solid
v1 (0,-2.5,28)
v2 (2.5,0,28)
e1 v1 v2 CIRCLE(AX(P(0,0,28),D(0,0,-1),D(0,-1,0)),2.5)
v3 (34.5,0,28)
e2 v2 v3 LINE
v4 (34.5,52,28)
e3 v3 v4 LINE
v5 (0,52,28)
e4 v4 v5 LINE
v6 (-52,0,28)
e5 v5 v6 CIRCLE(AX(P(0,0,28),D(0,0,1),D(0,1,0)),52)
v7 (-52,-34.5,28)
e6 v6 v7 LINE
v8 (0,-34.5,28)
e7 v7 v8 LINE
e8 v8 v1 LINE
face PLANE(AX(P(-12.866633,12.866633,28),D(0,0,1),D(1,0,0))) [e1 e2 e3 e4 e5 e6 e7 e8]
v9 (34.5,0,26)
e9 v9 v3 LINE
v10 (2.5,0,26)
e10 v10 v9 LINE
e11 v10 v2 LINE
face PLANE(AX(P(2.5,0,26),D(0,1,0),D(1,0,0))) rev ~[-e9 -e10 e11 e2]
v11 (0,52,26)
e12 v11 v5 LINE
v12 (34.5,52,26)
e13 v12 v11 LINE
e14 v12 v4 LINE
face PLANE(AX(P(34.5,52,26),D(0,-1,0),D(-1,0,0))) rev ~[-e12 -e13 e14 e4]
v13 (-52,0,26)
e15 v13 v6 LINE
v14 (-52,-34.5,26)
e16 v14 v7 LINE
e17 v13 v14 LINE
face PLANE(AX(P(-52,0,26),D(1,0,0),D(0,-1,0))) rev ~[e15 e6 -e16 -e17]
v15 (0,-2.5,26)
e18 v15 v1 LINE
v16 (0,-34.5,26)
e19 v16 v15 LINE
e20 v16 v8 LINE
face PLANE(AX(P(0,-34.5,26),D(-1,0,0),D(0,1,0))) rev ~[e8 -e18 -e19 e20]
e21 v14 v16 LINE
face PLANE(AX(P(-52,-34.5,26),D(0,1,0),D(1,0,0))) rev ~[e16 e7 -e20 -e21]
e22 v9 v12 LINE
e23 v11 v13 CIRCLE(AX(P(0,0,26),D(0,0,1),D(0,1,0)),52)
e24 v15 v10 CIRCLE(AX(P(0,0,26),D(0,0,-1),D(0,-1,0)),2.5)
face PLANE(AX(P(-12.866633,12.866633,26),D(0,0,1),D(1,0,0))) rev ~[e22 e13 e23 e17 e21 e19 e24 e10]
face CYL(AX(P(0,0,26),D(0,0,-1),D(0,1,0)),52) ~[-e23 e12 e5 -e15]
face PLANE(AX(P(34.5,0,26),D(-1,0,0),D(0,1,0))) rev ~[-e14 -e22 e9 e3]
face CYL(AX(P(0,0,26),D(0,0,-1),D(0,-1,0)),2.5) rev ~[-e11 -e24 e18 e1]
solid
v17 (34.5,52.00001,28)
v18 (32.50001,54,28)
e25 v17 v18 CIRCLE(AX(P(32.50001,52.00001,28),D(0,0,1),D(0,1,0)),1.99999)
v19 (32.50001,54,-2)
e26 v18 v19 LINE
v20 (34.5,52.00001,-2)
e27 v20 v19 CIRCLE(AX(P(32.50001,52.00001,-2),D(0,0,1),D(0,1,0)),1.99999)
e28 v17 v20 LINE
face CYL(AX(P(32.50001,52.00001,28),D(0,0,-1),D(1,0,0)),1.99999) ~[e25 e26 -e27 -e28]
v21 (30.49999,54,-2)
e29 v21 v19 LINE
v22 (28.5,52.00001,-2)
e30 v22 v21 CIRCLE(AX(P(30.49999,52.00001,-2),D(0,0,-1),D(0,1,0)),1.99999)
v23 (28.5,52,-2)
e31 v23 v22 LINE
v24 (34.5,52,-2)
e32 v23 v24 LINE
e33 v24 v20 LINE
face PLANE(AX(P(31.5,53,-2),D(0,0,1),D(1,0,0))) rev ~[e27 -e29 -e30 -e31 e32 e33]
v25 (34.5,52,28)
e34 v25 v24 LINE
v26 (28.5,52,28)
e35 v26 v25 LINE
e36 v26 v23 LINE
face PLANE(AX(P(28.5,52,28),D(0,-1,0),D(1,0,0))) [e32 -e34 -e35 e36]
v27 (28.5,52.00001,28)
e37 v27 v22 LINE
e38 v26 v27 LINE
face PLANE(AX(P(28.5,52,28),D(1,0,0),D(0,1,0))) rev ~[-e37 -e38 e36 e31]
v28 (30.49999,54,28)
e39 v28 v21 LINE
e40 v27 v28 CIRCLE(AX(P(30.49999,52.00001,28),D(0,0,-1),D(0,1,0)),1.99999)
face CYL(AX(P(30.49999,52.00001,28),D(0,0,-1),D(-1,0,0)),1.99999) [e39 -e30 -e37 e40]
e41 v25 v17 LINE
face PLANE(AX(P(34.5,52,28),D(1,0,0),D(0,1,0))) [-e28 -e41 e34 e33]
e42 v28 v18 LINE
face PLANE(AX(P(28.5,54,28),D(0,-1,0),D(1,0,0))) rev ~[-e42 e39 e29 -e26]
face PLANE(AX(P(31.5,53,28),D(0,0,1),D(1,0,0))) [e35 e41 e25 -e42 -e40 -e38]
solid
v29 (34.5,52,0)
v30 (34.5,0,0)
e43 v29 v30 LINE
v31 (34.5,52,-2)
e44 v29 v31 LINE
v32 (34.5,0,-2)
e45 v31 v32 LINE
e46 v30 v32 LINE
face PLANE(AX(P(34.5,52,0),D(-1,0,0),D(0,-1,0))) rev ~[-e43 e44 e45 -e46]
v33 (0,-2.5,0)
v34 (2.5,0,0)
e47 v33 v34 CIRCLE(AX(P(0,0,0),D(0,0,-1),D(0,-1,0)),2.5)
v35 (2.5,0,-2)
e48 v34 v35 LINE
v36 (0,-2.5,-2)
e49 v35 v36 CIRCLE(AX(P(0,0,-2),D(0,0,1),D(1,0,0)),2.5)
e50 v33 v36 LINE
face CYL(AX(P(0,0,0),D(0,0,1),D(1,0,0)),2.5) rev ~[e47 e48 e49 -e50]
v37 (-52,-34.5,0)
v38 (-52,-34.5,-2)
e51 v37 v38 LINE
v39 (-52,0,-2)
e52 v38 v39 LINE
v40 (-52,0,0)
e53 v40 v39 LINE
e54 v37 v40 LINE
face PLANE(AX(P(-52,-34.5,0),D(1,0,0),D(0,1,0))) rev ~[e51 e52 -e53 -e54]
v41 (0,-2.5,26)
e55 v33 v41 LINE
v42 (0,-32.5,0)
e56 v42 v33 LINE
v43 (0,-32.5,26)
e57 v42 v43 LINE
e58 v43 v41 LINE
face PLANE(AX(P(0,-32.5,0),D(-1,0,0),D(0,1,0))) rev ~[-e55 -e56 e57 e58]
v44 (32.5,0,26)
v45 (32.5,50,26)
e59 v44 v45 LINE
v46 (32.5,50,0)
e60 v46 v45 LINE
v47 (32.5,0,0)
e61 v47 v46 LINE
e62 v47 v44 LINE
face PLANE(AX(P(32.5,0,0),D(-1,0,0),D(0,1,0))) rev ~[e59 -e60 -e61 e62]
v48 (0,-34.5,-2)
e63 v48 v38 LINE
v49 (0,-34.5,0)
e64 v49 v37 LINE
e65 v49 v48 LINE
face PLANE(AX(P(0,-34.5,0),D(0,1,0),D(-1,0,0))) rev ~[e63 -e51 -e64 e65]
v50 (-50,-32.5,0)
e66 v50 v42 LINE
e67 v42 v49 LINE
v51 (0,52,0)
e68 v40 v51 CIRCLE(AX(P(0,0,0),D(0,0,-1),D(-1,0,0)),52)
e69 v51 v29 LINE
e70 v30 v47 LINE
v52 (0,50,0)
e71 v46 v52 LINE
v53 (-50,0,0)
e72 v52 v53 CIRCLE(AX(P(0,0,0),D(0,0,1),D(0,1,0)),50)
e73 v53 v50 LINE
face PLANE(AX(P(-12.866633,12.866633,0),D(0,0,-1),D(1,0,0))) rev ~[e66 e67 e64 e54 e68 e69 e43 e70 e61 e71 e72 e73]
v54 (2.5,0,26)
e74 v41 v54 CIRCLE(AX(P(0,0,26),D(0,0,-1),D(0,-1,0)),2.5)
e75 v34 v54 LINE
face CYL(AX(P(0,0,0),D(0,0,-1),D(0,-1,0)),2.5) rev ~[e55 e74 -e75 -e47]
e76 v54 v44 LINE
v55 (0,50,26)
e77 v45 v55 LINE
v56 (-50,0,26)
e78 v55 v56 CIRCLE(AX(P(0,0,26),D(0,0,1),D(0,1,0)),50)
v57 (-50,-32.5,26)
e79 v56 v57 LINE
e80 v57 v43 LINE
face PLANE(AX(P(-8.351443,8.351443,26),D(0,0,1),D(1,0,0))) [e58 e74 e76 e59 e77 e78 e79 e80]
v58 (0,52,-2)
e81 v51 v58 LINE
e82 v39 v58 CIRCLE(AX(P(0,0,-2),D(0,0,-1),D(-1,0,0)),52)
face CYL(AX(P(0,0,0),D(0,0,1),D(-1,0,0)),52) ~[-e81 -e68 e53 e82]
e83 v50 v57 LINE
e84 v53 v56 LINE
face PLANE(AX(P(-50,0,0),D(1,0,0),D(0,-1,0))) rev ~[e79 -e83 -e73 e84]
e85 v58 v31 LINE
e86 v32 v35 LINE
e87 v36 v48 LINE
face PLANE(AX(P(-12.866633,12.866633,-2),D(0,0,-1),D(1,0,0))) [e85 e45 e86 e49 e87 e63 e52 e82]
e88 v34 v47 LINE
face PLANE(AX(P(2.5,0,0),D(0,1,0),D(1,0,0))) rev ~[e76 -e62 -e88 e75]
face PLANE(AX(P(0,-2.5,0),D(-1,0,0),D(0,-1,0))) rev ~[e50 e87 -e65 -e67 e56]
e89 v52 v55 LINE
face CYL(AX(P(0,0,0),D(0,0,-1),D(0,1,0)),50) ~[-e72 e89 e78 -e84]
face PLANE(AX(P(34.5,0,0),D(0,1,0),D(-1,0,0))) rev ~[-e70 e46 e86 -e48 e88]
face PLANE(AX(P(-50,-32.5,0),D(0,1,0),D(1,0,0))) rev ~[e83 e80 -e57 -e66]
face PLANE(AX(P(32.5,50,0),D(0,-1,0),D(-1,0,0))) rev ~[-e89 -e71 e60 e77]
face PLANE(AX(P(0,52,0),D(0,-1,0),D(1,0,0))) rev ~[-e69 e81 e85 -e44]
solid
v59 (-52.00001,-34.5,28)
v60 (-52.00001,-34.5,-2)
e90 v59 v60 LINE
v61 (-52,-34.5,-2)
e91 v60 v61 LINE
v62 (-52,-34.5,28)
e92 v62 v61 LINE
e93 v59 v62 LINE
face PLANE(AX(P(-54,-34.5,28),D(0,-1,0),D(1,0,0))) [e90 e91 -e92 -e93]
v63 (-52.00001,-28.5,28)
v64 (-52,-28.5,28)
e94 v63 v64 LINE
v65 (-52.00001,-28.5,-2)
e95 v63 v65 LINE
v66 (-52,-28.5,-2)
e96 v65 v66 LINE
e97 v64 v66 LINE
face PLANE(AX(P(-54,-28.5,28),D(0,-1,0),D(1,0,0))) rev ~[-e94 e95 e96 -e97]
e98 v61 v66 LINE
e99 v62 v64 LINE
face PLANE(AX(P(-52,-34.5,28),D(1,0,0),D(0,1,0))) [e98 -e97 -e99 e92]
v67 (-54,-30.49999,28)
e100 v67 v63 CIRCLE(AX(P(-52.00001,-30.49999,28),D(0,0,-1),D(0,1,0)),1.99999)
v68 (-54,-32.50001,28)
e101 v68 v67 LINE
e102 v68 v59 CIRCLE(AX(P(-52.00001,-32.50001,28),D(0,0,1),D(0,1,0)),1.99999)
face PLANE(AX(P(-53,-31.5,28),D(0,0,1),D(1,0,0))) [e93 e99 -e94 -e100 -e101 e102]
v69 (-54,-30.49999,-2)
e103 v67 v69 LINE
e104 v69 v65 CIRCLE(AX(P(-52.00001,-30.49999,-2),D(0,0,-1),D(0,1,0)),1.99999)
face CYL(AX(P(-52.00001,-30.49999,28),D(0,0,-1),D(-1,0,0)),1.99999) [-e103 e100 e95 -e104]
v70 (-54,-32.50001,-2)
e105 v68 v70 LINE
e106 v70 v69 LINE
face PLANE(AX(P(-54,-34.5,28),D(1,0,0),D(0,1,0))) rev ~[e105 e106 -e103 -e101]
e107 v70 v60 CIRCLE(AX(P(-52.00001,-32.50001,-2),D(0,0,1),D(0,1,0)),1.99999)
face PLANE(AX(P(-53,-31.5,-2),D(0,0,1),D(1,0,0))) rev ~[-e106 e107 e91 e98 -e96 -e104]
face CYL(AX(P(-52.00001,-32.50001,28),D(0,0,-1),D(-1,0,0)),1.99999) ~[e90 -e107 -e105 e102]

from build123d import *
from build123d import SkipClean  # not in build123d's __all__

# Parameters (mm, degrees)
F1_DEPTH = 26
F3_DEPTH = 2
F5_DEPTH = 2
F6_W     = 2
F6_H     = 6
F7_DEPTH = 30
F6_W_2   = 6
F6_H_2   = 2
F8_R     = 1.99999
F8_2_R   = 1.99999


# Not quite as in the source:
# - a fillet or chamfer is up to 0.001 mm smaller than in the source, because OpenCascade refuses the exact size


with BuildPart() as f1:
    # F0 (on Top) → F1 (new body)
    with BuildSketch(Plane.XY):
        with BuildLine():
            ThreePointArc((0, -2.5), (-1.767766953, 1.767766953), (2.5, 0))
            Line((2.5, 0), (32.5, 0))
            Line((32.5, 0), (32.5, 50))
            Line((32.5, 50), (0, 50))
            ThreePointArc((0, 50), (-35.3553390593, 35.3553390593), (-50, 0))
            Line((-50, 0), (-50, -32.5))
            Line((-50, -32.5), (0, -32.5))
            Line((0, -32.5), (0, -2.5))
        make_face()
    extrude(amount=F1_DEPTH)

    # F4 (on face) → F5 (join)
    with BuildSketch(Plane(origin=(0, 0, 0), x_dir=(1, 0, 0), z_dir=(0, 0, -1))):
        with BuildLine():
            Line((0, 34.5), (-52, 34.5))
            Line((-52, 34.5), (-52, 0))
            ThreePointArc((-52, 0), (-36.7695526217, -36.7695526217), (0, -52))
            Line((0, -52), (34.5, -52))
            Line((34.5, -52), (34.5, 0))
            Line((34.5, 0), (32.5, 0))
            Line((32.5, 0), (32.5, -50))
            Line((32.5, -50), (0, -50))
            ThreePointArc((0, -50), (-35.3553390593, -35.3553390593), (-50, 0))
            Line((-50, 0), (-50, 32.5))
            Line((-50, 32.5), (0, 32.5))
            Line((0, 32.5), (0, 34.5))
        make_face()
        with BuildLine():
            Line((0, 2.5), (0, 32.5))
            Line((0, 32.5), (-50, 32.5))
            Line((-50, 32.5), (-50, 0))
            ThreePointArc((-50, 0), (-35.3553390593, -35.3553390593), (0, -50))
            Line((0, -50), (32.5, -50))
            Line((32.5, -50), (32.5, 0))
            Line((32.5, 0), (2.5, 0))
            ThreePointArc((2.5, 0), (-1.767766953, -1.767766953), (0, 2.5))
        make_face()
    with SkipClean():  # cleaning this boolean's faces spoils the solid; the shape is the same uncleaned
        extrude(amount=F5_DEPTH)


with BuildPart() as f3:
    # F2 (on face) → F3 (new body)
    with BuildSketch(Plane.XY.offset(26)):
        with BuildLine():
            Line((34.5, 0), (34.5, 52))
            Line((34.5, 52), (0, 52))
            ThreePointArc((0, 52), (-36.7695526217, 36.7695526217), (-52, 0))
            Line((-52, 0), (-52, -34.5))
            Line((-52, -34.5), (0, -34.5))
            Line((0, -34.5), (0, -32.5))
            Line((0, -32.5), (-50, -32.5))
            Line((-50, -32.5), (-50, 0))
            ThreePointArc((-50, 0), (-35.3553390593, 35.3553390593), (0, 50))
            Line((0, 50), (32.5, 50))
            Line((32.5, 50), (32.5, 0))
            Line((32.5, 0), (34.5, 0))
        make_face()
        with BuildLine():
            Line((2.5, 0), (32.5, 0))
            Line((32.5, 0), (32.5, 50))
            Line((32.5, 50), (0, 50))
            ThreePointArc((0, 50), (-35.3553390593, 35.3553390593), (-50, 0))
            Line((-50, 0), (-50, -32.5))
            Line((-50, -32.5), (0, -32.5))
            Line((0, -32.5), (0, -2.5))
            ThreePointArc((0, -2.5), (-1.767766953, 1.767766953), (2.5, 0))
        make_face()
    extrude(amount=F3_DEPTH)


with BuildPart() as f7:
    # F6 (on face) → F7 (new body, through all)
    with BuildSketch(Plane.XY.offset(28)):
        with Locations((-53, -31.5)):
            Rectangle(F6_W, F6_H)
    extrude(amount=-F7_DEPTH)

    # F8#2 (radius 2 in the source; OpenCascade refuses exactly that, so slightly less here)
    f8_2_edges = [f7.edges().sort_by_distance(p)[0] for p in [
        (-54, -28.5, 13),
        (-54, -34.5, 13),
    ]]
    fillet(f8_2_edges, radius=F8_2_R)


with BuildPart() as f7b:
    # F6 (on face) → F7, piece 2 (new body, through all)
    with BuildSketch(Plane.XY.offset(28)):
        with Locations((31.5, 53)):
            Rectangle(F6_W_2, F6_H_2)
    extrude(amount=-F7_DEPTH)

    # F8 (radius 2 in the source; OpenCascade refuses exactly that, so slightly less here)
    f8_edges = [f7b.edges().sort_by_distance(p)[0] for p in [
        (28.5, 54, 13),
        (34.5, 54, 13),
    ]]
    fillet(f8_edges, radius=F8_R)


solid = Compound([f1.part, f3.part, f7.part, f7b.part])
